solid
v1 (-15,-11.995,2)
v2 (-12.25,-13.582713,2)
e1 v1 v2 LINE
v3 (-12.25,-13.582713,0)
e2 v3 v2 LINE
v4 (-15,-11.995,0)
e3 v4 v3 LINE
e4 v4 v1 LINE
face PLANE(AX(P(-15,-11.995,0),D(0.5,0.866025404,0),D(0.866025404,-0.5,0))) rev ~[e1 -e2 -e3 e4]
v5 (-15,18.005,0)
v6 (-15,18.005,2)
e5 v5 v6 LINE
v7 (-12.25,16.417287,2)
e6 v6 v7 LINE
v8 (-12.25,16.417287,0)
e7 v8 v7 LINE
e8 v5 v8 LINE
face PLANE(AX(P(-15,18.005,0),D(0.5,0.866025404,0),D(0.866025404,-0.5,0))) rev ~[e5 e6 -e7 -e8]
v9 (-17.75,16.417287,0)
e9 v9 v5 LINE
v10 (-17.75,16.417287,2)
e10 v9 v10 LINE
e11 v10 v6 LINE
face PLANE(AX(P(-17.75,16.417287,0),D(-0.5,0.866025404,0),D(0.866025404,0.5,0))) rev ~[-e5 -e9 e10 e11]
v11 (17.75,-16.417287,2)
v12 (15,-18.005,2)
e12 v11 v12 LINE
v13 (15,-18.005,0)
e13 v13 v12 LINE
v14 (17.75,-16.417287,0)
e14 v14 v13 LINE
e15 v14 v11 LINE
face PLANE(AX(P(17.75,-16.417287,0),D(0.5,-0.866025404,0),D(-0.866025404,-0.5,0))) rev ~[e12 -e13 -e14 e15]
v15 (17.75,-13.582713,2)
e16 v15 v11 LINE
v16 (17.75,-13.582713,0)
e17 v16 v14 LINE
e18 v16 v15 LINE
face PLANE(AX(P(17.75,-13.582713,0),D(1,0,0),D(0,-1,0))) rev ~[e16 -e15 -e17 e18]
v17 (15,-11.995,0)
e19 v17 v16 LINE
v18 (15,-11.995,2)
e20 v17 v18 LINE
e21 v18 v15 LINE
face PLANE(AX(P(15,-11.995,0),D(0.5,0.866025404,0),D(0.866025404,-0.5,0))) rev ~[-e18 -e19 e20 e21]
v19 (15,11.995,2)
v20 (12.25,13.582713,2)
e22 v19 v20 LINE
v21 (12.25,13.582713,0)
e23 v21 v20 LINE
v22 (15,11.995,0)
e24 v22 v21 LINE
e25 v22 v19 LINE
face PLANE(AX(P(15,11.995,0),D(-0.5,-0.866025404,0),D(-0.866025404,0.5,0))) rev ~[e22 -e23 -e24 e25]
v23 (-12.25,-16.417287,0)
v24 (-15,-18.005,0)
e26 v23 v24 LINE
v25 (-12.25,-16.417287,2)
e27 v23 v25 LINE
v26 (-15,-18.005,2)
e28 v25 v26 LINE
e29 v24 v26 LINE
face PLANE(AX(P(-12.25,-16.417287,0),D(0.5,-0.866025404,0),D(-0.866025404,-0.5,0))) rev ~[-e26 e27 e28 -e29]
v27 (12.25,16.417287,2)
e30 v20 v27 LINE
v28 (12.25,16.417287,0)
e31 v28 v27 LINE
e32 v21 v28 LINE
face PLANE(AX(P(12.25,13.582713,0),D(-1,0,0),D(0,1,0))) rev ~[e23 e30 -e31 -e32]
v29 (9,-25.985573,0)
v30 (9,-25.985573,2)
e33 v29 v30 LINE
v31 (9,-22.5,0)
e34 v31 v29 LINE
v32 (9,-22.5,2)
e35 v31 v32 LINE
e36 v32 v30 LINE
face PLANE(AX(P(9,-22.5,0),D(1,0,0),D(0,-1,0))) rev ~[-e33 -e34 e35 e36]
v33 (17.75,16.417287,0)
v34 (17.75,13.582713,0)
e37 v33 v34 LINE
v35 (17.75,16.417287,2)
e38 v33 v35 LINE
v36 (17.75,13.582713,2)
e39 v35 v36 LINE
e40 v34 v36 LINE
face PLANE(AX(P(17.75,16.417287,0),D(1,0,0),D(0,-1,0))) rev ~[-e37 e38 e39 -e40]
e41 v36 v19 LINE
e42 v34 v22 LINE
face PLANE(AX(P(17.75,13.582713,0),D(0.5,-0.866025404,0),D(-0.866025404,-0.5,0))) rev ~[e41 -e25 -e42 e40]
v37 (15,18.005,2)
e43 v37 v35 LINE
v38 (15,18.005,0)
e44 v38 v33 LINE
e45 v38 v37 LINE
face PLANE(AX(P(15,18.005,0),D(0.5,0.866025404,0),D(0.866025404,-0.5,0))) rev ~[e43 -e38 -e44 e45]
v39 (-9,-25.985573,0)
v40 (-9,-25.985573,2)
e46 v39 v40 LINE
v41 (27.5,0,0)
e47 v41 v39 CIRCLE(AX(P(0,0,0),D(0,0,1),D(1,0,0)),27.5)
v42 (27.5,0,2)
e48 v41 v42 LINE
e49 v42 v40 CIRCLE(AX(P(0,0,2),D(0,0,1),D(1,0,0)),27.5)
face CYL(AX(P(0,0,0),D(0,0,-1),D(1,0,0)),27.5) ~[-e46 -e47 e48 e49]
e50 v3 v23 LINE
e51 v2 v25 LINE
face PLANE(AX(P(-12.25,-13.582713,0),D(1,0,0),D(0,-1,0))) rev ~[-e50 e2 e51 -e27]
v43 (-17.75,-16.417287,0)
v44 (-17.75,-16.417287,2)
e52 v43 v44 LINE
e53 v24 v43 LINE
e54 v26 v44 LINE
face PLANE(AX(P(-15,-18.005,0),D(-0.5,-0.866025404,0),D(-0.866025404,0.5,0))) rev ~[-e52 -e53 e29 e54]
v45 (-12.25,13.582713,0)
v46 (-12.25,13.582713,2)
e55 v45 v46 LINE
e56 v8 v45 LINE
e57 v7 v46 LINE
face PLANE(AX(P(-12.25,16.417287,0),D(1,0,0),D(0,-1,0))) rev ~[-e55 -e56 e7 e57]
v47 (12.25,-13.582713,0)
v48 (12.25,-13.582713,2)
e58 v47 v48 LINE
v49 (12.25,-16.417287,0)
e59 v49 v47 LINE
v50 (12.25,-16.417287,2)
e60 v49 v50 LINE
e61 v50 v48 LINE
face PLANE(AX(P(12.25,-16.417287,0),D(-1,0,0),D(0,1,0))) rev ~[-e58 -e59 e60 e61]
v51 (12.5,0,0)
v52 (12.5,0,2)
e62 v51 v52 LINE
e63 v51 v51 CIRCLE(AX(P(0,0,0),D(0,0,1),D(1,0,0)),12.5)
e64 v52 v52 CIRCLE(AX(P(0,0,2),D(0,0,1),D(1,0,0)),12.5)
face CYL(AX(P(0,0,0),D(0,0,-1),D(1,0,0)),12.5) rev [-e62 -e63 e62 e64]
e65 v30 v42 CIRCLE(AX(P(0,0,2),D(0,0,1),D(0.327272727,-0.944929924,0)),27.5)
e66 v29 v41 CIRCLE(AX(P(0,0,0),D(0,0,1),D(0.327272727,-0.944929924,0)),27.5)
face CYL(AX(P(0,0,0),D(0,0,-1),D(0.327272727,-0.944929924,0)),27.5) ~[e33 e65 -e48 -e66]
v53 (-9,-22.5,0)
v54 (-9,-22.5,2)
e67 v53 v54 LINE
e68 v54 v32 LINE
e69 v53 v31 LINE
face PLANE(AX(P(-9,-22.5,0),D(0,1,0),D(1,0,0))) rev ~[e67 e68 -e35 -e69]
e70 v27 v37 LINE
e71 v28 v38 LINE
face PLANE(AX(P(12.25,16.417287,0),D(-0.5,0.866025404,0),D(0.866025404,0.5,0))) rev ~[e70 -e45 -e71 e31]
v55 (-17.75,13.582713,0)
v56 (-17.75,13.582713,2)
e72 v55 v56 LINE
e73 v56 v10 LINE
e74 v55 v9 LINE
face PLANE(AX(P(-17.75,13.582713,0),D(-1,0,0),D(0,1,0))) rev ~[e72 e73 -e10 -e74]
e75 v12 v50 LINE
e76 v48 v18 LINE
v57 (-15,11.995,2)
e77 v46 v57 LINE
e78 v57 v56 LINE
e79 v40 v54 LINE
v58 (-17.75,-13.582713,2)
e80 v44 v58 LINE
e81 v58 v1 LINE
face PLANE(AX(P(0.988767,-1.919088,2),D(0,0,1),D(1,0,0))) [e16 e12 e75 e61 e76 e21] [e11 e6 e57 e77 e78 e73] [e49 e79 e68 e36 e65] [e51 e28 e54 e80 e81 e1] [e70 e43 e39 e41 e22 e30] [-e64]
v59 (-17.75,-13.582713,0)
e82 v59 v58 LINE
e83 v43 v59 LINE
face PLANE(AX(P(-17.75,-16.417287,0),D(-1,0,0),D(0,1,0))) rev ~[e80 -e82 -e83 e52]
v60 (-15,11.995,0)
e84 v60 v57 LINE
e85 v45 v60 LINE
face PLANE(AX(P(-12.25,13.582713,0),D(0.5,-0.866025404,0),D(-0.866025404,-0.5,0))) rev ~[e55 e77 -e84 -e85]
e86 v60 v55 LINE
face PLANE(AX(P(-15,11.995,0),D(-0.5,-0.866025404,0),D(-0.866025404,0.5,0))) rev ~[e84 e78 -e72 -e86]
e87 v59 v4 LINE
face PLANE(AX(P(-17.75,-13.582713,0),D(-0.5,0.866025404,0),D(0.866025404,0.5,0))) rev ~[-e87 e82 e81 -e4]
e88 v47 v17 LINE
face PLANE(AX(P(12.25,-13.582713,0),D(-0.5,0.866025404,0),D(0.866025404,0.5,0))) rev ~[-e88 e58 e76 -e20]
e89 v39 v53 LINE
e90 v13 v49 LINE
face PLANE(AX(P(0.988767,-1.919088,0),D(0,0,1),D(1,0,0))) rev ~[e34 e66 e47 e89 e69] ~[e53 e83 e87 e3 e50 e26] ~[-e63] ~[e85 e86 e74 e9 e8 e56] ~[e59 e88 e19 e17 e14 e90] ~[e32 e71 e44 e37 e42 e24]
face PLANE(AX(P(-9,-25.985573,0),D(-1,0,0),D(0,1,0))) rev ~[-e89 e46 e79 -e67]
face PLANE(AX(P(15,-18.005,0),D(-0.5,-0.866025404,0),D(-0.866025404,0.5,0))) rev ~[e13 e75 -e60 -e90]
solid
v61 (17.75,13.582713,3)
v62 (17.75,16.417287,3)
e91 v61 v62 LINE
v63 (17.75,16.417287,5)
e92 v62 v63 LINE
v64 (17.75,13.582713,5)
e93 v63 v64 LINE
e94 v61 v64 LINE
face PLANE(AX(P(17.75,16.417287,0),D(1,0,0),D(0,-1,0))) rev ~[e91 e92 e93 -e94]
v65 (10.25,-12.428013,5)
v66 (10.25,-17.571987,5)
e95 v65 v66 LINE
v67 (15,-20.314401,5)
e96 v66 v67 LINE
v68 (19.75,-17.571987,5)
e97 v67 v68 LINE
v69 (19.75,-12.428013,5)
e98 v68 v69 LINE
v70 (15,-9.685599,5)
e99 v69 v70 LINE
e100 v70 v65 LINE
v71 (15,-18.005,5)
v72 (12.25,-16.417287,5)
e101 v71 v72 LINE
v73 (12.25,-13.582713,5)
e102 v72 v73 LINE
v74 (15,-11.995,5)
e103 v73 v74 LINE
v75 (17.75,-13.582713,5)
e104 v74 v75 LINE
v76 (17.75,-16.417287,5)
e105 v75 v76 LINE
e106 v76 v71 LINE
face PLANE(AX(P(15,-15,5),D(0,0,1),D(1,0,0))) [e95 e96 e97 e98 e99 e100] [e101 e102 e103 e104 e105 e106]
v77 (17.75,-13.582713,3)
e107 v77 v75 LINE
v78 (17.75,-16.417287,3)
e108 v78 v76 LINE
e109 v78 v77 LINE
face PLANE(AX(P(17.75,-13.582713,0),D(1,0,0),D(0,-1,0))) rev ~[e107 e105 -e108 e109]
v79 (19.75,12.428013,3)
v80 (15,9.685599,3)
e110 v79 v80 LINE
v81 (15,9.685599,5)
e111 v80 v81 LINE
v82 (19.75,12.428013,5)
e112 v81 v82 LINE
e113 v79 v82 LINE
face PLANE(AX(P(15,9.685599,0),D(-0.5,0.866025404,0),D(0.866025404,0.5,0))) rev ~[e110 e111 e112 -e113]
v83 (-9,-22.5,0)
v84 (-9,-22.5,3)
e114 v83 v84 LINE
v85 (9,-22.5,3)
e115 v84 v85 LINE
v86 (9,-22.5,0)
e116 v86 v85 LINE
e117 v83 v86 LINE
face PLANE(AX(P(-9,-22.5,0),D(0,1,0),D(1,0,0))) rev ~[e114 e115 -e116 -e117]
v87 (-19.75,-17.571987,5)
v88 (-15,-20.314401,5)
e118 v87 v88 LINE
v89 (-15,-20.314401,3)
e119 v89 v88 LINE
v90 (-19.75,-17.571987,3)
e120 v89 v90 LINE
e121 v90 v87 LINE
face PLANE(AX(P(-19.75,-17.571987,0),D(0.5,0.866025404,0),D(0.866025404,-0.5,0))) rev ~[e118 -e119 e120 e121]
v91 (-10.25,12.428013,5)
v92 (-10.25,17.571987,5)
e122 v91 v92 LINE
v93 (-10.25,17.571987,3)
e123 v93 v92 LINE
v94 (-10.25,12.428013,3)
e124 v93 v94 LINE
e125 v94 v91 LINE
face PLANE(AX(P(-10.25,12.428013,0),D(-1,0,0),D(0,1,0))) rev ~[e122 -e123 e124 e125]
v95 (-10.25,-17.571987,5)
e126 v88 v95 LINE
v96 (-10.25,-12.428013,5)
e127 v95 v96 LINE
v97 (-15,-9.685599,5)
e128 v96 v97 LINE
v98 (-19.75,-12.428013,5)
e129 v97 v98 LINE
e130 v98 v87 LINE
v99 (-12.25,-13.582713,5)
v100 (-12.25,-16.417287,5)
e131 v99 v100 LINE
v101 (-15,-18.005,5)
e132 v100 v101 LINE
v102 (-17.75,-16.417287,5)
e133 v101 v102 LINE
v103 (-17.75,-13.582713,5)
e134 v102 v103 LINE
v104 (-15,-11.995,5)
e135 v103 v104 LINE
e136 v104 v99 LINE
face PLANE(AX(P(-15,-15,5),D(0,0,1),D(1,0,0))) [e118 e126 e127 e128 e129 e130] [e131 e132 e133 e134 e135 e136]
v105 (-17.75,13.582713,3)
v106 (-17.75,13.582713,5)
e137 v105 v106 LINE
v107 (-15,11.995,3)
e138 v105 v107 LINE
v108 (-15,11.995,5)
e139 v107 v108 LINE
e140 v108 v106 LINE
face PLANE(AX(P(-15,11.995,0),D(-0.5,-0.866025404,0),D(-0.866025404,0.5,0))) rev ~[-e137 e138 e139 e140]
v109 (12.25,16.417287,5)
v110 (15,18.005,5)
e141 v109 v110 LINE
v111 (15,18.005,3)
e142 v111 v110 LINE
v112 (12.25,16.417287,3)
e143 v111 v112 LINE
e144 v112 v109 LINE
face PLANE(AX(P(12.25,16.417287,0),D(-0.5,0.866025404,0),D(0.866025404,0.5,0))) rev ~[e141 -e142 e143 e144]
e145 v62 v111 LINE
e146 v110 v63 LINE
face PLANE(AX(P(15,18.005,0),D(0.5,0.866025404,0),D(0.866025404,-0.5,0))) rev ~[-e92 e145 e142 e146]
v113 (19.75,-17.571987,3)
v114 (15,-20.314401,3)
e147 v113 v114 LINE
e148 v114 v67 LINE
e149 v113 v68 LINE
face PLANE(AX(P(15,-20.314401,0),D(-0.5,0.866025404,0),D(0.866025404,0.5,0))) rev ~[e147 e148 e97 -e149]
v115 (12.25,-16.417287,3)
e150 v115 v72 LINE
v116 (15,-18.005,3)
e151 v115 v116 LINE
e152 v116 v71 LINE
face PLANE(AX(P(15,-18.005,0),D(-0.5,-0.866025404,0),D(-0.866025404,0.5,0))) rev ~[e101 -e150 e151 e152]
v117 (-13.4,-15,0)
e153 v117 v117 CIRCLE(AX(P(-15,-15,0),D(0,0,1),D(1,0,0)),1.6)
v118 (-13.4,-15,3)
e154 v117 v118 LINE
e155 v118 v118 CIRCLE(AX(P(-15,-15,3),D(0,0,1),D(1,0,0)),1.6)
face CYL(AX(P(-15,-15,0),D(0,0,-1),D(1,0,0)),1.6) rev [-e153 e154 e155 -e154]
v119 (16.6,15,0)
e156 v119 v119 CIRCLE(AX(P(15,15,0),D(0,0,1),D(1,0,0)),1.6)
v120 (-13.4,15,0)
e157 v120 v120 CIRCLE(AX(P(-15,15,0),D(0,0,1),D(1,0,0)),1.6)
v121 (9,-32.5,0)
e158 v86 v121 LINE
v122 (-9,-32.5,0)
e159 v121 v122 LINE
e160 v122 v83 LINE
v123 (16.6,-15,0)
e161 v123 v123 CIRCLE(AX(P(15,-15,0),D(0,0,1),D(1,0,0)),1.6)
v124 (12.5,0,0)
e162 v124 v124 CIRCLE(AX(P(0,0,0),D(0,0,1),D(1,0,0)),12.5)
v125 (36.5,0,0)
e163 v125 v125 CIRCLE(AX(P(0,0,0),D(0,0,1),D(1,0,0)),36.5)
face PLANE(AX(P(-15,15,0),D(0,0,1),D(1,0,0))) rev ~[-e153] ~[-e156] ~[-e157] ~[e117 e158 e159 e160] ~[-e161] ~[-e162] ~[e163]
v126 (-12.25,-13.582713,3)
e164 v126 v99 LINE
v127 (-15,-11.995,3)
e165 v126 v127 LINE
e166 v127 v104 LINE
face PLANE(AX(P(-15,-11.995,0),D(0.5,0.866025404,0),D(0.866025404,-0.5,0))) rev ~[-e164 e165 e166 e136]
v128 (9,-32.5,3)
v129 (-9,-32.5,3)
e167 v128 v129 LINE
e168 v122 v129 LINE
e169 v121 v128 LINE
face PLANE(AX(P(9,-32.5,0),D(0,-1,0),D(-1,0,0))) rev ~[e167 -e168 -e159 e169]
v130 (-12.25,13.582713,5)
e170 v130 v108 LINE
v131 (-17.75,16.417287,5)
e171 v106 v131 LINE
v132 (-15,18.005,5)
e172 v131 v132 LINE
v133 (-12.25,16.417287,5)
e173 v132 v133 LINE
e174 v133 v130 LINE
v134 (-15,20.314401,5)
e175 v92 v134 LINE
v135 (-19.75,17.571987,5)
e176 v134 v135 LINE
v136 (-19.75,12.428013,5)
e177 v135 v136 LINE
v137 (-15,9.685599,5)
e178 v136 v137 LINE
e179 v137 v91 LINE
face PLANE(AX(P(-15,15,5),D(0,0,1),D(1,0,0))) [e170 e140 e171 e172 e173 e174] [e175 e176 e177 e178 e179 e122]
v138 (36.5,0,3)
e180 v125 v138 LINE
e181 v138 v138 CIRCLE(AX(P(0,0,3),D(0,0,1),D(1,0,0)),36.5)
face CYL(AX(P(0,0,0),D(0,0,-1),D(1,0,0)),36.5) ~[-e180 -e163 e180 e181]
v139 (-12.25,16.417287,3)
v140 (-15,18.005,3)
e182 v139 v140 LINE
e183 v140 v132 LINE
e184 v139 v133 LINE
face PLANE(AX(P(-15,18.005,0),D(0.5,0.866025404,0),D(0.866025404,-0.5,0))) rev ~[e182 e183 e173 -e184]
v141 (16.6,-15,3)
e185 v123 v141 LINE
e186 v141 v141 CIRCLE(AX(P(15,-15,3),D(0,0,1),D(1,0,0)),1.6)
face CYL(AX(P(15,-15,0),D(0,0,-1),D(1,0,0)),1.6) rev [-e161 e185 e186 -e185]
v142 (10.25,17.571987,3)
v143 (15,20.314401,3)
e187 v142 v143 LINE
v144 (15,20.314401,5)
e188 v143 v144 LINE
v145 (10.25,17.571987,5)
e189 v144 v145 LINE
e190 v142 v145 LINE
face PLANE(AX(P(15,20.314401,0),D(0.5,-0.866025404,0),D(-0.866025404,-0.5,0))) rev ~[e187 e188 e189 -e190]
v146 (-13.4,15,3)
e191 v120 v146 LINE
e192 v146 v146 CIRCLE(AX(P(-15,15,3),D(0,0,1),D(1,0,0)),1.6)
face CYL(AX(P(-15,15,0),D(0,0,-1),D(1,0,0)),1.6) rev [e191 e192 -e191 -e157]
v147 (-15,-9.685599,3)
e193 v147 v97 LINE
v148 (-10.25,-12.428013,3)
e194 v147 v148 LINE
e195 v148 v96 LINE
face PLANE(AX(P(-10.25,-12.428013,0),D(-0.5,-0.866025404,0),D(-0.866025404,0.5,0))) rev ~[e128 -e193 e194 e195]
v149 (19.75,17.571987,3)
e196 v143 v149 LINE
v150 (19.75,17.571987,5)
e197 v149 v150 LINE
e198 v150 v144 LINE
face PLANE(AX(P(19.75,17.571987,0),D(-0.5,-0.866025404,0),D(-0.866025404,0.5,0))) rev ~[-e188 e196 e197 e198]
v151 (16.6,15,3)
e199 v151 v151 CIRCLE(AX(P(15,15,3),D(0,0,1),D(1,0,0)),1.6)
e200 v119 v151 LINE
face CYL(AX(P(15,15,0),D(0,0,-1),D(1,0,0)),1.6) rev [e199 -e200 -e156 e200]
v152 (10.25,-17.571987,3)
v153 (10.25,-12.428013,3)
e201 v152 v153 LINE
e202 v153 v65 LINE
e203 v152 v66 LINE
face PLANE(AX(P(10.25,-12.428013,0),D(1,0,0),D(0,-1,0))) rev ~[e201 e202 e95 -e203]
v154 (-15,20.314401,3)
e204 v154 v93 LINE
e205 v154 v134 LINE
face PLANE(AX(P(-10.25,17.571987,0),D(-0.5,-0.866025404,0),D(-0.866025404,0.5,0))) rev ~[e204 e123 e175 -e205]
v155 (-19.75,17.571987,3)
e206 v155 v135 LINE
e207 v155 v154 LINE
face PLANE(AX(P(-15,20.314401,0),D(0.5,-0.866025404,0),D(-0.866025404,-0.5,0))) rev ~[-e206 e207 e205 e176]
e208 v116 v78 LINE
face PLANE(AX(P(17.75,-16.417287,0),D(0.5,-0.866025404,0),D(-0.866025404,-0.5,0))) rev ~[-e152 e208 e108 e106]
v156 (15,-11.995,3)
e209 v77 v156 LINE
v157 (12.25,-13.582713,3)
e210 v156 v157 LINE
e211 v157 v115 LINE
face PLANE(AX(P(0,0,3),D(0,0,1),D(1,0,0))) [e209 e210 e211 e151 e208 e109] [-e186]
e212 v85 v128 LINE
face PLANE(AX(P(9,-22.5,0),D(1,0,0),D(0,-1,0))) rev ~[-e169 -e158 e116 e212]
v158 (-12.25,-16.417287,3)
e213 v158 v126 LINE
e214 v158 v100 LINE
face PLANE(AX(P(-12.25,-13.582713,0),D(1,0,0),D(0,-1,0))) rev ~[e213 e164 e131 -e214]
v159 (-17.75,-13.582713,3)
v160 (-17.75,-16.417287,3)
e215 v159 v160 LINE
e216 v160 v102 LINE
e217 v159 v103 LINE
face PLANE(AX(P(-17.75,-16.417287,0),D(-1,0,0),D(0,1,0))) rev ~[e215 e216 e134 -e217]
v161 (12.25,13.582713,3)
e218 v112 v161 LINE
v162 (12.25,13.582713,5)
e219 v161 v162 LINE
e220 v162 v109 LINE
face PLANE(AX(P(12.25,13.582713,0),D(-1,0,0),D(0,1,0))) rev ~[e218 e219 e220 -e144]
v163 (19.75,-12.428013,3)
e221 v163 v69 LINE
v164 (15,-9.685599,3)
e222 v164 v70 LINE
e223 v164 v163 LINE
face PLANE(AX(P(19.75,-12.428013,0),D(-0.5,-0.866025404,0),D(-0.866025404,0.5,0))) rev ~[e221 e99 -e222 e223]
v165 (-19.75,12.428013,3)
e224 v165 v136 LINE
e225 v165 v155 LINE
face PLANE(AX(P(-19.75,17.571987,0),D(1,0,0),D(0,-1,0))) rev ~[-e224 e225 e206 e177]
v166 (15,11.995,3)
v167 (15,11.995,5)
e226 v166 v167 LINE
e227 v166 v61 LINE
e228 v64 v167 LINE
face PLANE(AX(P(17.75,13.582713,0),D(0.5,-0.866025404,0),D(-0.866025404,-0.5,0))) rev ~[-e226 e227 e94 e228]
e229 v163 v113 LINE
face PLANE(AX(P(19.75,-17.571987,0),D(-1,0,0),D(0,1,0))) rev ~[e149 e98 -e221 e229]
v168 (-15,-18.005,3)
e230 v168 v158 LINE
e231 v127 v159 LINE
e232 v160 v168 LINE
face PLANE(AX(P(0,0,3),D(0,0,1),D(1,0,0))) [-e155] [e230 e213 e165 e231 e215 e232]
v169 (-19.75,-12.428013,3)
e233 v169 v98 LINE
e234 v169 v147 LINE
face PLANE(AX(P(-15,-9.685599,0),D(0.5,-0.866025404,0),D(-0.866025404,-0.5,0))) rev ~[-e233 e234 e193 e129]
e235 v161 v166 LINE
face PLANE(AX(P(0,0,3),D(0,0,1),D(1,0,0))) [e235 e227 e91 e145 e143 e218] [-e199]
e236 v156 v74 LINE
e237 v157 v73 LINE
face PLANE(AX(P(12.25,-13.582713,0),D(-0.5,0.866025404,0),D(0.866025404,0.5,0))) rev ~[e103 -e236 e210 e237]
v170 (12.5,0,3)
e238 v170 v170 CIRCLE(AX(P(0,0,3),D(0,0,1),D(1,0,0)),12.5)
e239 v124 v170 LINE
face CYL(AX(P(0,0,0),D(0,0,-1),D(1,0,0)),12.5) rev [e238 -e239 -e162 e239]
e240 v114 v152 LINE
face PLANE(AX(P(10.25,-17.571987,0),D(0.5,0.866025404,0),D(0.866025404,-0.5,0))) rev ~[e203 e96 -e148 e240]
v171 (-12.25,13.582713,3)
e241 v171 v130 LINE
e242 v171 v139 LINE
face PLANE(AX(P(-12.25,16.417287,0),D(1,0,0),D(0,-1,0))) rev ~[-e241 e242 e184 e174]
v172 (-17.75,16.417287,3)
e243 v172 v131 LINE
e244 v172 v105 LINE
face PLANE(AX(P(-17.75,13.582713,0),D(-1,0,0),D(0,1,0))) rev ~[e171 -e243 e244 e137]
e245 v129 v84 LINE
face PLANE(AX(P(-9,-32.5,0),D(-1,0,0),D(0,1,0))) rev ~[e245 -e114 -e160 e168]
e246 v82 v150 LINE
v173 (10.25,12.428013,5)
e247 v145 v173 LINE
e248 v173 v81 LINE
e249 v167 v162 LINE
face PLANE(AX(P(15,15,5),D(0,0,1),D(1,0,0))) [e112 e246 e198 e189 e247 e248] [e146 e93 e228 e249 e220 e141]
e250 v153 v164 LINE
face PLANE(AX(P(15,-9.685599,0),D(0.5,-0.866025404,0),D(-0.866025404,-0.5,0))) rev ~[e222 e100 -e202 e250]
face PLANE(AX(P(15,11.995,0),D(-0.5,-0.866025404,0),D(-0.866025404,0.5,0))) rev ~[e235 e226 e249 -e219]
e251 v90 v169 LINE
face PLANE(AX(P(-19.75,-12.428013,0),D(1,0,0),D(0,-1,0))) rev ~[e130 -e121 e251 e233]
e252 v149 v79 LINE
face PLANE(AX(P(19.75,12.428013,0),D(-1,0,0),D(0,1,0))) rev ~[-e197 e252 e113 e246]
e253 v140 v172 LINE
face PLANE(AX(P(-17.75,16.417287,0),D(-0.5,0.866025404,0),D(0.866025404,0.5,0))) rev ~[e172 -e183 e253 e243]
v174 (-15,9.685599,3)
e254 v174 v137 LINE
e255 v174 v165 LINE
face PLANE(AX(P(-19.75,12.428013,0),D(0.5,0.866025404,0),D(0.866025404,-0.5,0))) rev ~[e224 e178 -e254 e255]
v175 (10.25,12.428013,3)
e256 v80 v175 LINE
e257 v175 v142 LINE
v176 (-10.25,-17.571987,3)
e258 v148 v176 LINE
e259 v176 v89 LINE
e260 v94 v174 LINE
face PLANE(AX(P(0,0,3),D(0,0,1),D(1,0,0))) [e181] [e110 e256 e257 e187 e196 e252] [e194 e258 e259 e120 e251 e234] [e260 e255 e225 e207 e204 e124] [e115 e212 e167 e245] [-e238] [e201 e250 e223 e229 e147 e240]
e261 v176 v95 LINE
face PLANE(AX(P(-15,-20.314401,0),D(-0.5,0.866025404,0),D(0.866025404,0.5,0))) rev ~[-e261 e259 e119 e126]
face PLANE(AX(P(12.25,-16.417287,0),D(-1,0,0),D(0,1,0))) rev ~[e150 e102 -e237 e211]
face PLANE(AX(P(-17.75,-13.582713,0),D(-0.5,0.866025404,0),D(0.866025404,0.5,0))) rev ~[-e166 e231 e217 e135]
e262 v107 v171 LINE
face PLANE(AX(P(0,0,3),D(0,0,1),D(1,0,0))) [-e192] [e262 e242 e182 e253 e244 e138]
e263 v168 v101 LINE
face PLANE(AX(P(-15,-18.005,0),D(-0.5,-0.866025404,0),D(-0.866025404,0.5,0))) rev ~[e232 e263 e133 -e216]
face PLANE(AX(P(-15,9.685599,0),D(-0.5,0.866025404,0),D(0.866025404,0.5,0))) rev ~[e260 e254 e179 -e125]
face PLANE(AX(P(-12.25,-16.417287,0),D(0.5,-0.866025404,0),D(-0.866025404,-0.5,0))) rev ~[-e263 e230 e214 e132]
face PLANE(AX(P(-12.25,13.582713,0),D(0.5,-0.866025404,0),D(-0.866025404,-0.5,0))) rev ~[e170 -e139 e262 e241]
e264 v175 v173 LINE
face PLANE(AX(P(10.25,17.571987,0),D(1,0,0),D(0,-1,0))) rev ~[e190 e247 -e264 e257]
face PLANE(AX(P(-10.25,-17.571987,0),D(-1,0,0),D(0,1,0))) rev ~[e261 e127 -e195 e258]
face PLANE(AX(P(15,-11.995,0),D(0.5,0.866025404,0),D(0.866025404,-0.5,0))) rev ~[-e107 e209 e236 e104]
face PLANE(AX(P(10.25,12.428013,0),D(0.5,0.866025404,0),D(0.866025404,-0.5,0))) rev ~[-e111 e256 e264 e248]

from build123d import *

# Parameters (mm, degrees)
F0_R     = 36.5
F0_R_2   = 12.5
F0_R_3   = 1.6
F1_DEPTH = 3
F2_DEPTH = 5
F3_DEPTH = 2


# Not quite as in the source:
# - a feature names something its author has since deleted; it is built from what else it names


with BuildPart() as f1:
    # F0 (on Top) → F1 (new body)
    with BuildSketch(Plane.XY):
        Circle(F0_R)
        with BuildLine():
            Line((9, -25.9855729204), (9, -32.5))
            Line((9, -32.5), (-9, -32.5))
            Line((-9, -32.5), (-9, -25.9855729204))
            ThreePointArc((-9, -25.9855729204), (-15.9491379077, 22.4025668172), (27.5, 0))
            ThreePointArc((27.5, 0), (22.4025668172, -15.9491379077), (9, -25.9855729204))
        make_face(mode=Mode.SUBTRACT)
        with BuildLine():
            Line((9, -22.5), (9, -25.9855729204))
            ThreePointArc((9, -25.9855729204), (22.4025668172, -15.9491379077), (27.5, 0))
            ThreePointArc((27.5, 0), (-15.9491379077, 22.4025668172), (-9, -25.9855729204))
            Line((-9, -25.9855729204), (-9, -22.5))
            Line((-9, -22.5), (9, -22.5))
        make_face()
        Polygon((-10.25, -12.4280127019), (-10.25, -17.5719872981), (-15, -20.3144010768), (-19.75, -17.5719872981), (-19.75, -12.4280127019), (-15, -9.6855989232), align=None, mode=Mode.SUBTRACT)
        Polygon((15, -20.3144010768), (10.25, -17.5719872981), (10.25, -12.4280127019), (15, -9.6855989232), (19.75, -12.4280127019), (19.75, -17.5719872981), align=None, mode=Mode.SUBTRACT)
        Polygon((-15, 9.6855989232), (-19.75, 12.4280127019), (-19.75, 17.5719872981), (-15, 20.3144010768), (-10.25, 17.5719872981), (-10.25, 12.4280127019), align=None, mode=Mode.SUBTRACT)
        Circle(F0_R_2, mode=Mode.SUBTRACT)
        Polygon((10.25, 12.4280127019), (10.25, 17.5719872981), (15, 20.3144010768), (19.75, 17.5719872981), (19.75, 12.4280127019), (15, 9.6855989232), align=None, mode=Mode.SUBTRACT)
        Polygon((-19.75, 17.5719872981), (-19.75, 12.4280127019), (-15, 9.6855989232), (-10.25, 12.4280127019), (-10.25, 17.5719872981), (-15, 20.3144010768), align=None)
        Polygon((-17.75, 13.5827132403), (-17.75, 16.4172867597), (-15, 18.005), (-12.25, 16.4172867597), (-12.25, 13.5827132403), (-15, 11.995), align=None, mode=Mode.SUBTRACT)
        Polygon((-15, -20.3144010768), (-10.25, -17.5719872981), (-10.25, -12.4280127019), (-15, -9.6855989232), (-19.75, -12.4280127019), (-19.75, -17.5719872981), align=None)
        Polygon((-17.75, -16.4172867597), (-17.75, -13.5827132403), (-15, -11.995), (-12.25, -13.5827132403), (-12.25, -16.4172867597), (-15, -18.005), align=None, mode=Mode.SUBTRACT)
        Polygon((15, 20.3144010768), (10.25, 17.5719872981), (10.25, 12.4280127019), (15, 9.6855989232), (19.75, 12.4280127019), (19.75, 17.5719872981), align=None)
        Polygon((12.25, 13.5827132403), (12.25, 16.4172867597), (15, 18.005), (17.75, 16.4172867597), (17.75, 13.5827132403), (15, 11.995), align=None, mode=Mode.SUBTRACT)
        Polygon((10.25, -12.4280127019), (10.25, -17.5719872981), (15, -20.3144010768), (19.75, -17.5719872981), (19.75, -12.4280127019), (15, -9.6855989232), align=None)
        Polygon((15, -11.995), (17.75, -13.5827132403), (17.75, -16.4172867597), (15, -18.005), (12.25, -16.4172867597), (12.25, -13.5827132403), align=None, mode=Mode.SUBTRACT)
        Polygon((-15, 18.005), (-17.75, 16.4172867597), (-17.75, 13.5827132403), (-15, 11.995), (-12.25, 13.5827132403), (-12.25, 16.4172867597), align=None)
        with Locations((-15, 15)):
            Circle(F0_R_3, mode=Mode.SUBTRACT)
        Polygon((-15, -11.995), (-17.75, -13.5827132403), (-17.75, -16.4172867597), (-15, -18.005), (-12.25, -16.4172867597), (-12.25, -13.5827132403), align=None)
        with Locations((-15, -15)):
            Circle(F0_R_3, mode=Mode.SUBTRACT)
        Polygon((15, 18.005), (12.25, 16.4172867597), (12.25, 13.5827132403), (15, 11.995), (17.75, 13.5827132403), (17.75, 16.4172867597), align=None)
        with Locations((15, 15)):
            Circle(F0_R_3, mode=Mode.SUBTRACT)
        Polygon((17.75, -16.4172867597), (17.75, -13.5827132403), (15, -11.995), (12.25, -13.5827132403), (12.25, -16.4172867597), (15, -18.005), align=None)
        with Locations((15, -15)):
            Circle(F0_R_3, mode=Mode.SUBTRACT)
    extrude(amount=F1_DEPTH)

    # F0 (on Top) → F2 (join)
    with BuildSketch(Plane.XY):
        Polygon((-19.75, 17.5719872981), (-19.75, 12.4280127019), (-15, 9.6855989232), (-10.25, 12.4280127019), (-10.25, 17.5719872981), (-15, 20.3144010768), align=None)
        Polygon((-17.75, 13.5827132403), (-17.75, 16.4172867597), (-15, 18.005), (-12.25, 16.4172867597), (-12.25, 13.5827132403), (-15, 11.995), align=None, mode=Mode.SUBTRACT)
        Polygon((-15, -20.3144010768), (-10.25, -17.5719872981), (-10.25, -12.4280127019), (-15, -9.6855989232), (-19.75, -12.4280127019), (-19.75, -17.5719872981), align=None)
        Polygon((-17.75, -16.4172867597), (-17.75, -13.5827132403), (-15, -11.995), (-12.25, -13.5827132403), (-12.25, -16.4172867597), (-15, -18.005), align=None, mode=Mode.SUBTRACT)
        Polygon((15, 20.3144010768), (10.25, 17.5719872981), (10.25, 12.4280127019), (15, 9.6855989232), (19.75, 12.4280127019), (19.75, 17.5719872981), align=None)
        Polygon((12.25, 13.5827132403), (12.25, 16.4172867597), (15, 18.005), (17.75, 16.4172867597), (17.75, 13.5827132403), (15, 11.995), align=None, mode=Mode.SUBTRACT)
        Polygon((10.25, -12.4280127019), (10.25, -17.5719872981), (15, -20.3144010768), (19.75, -17.5719872981), (19.75, -12.4280127019), (15, -9.6855989232), align=None)
        Polygon((15, -11.995), (17.75, -13.5827132403), (17.75, -16.4172867597), (15, -18.005), (12.25, -16.4172867597), (12.25, -13.5827132403), align=None, mode=Mode.SUBTRACT)
    extrude(amount=F2_DEPTH)


with BuildPart() as f3:
    # F0 (on Top) → F3 (new body)
    with BuildSketch(Plane.XY):
        with BuildLine():
            Line((9, -22.5), (9, -25.9855729204))
            ThreePointArc((9, -25.9855729204), (22.4025668172, -15.9491379077), (27.5, 0))
            ThreePointArc((27.5, 0), (-15.9491379077, 22.4025668172), (-9, -25.9855729204))
            Line((-9, -25.9855729204), (-9, -22.5))
            Line((-9, -22.5), (9, -22.5))
        make_face()
        Polygon((-10.25, -12.4280127019), (-10.25, -17.5719872981), (-15, -20.3144010768), (-19.75, -17.5719872981), (-19.75, -12.4280127019), (-15, -9.6855989232), align=None, mode=Mode.SUBTRACT)
        Polygon((15, -20.3144010768), (10.25, -17.5719872981), (10.25, -12.4280127019), (15, -9.6855989232), (19.75, -12.4280127019), (19.75, -17.5719872981), align=None, mode=Mode.SUBTRACT)
        Polygon((-15, 9.6855989232), (-19.75, 12.4280127019), (-19.75, 17.5719872981), (-15, 20.3144010768), (-10.25, 17.5719872981), (-10.25, 12.4280127019), align=None, mode=Mode.SUBTRACT)
        Circle(F0_R_2, mode=Mode.SUBTRACT)
        Polygon((10.25, 12.4280127019), (10.25, 17.5719872981), (15, 20.3144010768), (19.75, 17.5719872981), (19.75, 12.4280127019), (15, 9.6855989232), align=None, mode=Mode.SUBTRACT)
        Polygon((-19.75, 17.5719872981), (-19.75, 12.4280127019), (-15, 9.6855989232), (-10.25, 12.4280127019), (-10.25, 17.5719872981), (-15, 20.3144010768), align=None)
        Polygon((-17.75, 13.5827132403), (-17.75, 16.4172867597), (-15, 18.005), (-12.25, 16.4172867597), (-12.25, 13.5827132403), (-15, 11.995), align=None, mode=Mode.SUBTRACT)
        Polygon((15, 20.3144010768), (10.25, 17.5719872981), (10.25, 12.4280127019), (15, 9.6855989232), (19.75, 12.4280127019), (19.75, 17.5719872981), align=None)
        Polygon((12.25, 13.5827132403), (12.25, 16.4172867597), (15, 18.005), (17.75, 16.4172867597), (17.75, 13.5827132403), (15, 11.995), align=None, mode=Mode.SUBTRACT)
        Polygon((-15, -20.3144010768), (-10.25, -17.5719872981), (-10.25, -12.4280127019), (-15, -9.6855989232), (-19.75, -12.4280127019), (-19.75, -17.5719872981), align=None)
        Polygon((-17.75, -16.4172867597), (-17.75, -13.5827132403), (-15, -11.995), (-12.25, -13.5827132403), (-12.25, -16.4172867597), (-15, -18.005), align=None, mode=Mode.SUBTRACT)
        Polygon((10.25, -12.4280127019), (10.25, -17.5719872981), (15, -20.3144010768), (19.75, -17.5719872981), (19.75, -12.4280127019), (15, -9.6855989232), align=None)
        Polygon((15, -11.995), (17.75, -13.5827132403), (17.75, -16.4172867597), (15, -18.005), (12.25, -16.4172867597), (12.25, -13.5827132403), align=None, mode=Mode.SUBTRACT)
    extrude(amount=F3_DEPTH)


solid = Compound([f1.part, f3.part])
